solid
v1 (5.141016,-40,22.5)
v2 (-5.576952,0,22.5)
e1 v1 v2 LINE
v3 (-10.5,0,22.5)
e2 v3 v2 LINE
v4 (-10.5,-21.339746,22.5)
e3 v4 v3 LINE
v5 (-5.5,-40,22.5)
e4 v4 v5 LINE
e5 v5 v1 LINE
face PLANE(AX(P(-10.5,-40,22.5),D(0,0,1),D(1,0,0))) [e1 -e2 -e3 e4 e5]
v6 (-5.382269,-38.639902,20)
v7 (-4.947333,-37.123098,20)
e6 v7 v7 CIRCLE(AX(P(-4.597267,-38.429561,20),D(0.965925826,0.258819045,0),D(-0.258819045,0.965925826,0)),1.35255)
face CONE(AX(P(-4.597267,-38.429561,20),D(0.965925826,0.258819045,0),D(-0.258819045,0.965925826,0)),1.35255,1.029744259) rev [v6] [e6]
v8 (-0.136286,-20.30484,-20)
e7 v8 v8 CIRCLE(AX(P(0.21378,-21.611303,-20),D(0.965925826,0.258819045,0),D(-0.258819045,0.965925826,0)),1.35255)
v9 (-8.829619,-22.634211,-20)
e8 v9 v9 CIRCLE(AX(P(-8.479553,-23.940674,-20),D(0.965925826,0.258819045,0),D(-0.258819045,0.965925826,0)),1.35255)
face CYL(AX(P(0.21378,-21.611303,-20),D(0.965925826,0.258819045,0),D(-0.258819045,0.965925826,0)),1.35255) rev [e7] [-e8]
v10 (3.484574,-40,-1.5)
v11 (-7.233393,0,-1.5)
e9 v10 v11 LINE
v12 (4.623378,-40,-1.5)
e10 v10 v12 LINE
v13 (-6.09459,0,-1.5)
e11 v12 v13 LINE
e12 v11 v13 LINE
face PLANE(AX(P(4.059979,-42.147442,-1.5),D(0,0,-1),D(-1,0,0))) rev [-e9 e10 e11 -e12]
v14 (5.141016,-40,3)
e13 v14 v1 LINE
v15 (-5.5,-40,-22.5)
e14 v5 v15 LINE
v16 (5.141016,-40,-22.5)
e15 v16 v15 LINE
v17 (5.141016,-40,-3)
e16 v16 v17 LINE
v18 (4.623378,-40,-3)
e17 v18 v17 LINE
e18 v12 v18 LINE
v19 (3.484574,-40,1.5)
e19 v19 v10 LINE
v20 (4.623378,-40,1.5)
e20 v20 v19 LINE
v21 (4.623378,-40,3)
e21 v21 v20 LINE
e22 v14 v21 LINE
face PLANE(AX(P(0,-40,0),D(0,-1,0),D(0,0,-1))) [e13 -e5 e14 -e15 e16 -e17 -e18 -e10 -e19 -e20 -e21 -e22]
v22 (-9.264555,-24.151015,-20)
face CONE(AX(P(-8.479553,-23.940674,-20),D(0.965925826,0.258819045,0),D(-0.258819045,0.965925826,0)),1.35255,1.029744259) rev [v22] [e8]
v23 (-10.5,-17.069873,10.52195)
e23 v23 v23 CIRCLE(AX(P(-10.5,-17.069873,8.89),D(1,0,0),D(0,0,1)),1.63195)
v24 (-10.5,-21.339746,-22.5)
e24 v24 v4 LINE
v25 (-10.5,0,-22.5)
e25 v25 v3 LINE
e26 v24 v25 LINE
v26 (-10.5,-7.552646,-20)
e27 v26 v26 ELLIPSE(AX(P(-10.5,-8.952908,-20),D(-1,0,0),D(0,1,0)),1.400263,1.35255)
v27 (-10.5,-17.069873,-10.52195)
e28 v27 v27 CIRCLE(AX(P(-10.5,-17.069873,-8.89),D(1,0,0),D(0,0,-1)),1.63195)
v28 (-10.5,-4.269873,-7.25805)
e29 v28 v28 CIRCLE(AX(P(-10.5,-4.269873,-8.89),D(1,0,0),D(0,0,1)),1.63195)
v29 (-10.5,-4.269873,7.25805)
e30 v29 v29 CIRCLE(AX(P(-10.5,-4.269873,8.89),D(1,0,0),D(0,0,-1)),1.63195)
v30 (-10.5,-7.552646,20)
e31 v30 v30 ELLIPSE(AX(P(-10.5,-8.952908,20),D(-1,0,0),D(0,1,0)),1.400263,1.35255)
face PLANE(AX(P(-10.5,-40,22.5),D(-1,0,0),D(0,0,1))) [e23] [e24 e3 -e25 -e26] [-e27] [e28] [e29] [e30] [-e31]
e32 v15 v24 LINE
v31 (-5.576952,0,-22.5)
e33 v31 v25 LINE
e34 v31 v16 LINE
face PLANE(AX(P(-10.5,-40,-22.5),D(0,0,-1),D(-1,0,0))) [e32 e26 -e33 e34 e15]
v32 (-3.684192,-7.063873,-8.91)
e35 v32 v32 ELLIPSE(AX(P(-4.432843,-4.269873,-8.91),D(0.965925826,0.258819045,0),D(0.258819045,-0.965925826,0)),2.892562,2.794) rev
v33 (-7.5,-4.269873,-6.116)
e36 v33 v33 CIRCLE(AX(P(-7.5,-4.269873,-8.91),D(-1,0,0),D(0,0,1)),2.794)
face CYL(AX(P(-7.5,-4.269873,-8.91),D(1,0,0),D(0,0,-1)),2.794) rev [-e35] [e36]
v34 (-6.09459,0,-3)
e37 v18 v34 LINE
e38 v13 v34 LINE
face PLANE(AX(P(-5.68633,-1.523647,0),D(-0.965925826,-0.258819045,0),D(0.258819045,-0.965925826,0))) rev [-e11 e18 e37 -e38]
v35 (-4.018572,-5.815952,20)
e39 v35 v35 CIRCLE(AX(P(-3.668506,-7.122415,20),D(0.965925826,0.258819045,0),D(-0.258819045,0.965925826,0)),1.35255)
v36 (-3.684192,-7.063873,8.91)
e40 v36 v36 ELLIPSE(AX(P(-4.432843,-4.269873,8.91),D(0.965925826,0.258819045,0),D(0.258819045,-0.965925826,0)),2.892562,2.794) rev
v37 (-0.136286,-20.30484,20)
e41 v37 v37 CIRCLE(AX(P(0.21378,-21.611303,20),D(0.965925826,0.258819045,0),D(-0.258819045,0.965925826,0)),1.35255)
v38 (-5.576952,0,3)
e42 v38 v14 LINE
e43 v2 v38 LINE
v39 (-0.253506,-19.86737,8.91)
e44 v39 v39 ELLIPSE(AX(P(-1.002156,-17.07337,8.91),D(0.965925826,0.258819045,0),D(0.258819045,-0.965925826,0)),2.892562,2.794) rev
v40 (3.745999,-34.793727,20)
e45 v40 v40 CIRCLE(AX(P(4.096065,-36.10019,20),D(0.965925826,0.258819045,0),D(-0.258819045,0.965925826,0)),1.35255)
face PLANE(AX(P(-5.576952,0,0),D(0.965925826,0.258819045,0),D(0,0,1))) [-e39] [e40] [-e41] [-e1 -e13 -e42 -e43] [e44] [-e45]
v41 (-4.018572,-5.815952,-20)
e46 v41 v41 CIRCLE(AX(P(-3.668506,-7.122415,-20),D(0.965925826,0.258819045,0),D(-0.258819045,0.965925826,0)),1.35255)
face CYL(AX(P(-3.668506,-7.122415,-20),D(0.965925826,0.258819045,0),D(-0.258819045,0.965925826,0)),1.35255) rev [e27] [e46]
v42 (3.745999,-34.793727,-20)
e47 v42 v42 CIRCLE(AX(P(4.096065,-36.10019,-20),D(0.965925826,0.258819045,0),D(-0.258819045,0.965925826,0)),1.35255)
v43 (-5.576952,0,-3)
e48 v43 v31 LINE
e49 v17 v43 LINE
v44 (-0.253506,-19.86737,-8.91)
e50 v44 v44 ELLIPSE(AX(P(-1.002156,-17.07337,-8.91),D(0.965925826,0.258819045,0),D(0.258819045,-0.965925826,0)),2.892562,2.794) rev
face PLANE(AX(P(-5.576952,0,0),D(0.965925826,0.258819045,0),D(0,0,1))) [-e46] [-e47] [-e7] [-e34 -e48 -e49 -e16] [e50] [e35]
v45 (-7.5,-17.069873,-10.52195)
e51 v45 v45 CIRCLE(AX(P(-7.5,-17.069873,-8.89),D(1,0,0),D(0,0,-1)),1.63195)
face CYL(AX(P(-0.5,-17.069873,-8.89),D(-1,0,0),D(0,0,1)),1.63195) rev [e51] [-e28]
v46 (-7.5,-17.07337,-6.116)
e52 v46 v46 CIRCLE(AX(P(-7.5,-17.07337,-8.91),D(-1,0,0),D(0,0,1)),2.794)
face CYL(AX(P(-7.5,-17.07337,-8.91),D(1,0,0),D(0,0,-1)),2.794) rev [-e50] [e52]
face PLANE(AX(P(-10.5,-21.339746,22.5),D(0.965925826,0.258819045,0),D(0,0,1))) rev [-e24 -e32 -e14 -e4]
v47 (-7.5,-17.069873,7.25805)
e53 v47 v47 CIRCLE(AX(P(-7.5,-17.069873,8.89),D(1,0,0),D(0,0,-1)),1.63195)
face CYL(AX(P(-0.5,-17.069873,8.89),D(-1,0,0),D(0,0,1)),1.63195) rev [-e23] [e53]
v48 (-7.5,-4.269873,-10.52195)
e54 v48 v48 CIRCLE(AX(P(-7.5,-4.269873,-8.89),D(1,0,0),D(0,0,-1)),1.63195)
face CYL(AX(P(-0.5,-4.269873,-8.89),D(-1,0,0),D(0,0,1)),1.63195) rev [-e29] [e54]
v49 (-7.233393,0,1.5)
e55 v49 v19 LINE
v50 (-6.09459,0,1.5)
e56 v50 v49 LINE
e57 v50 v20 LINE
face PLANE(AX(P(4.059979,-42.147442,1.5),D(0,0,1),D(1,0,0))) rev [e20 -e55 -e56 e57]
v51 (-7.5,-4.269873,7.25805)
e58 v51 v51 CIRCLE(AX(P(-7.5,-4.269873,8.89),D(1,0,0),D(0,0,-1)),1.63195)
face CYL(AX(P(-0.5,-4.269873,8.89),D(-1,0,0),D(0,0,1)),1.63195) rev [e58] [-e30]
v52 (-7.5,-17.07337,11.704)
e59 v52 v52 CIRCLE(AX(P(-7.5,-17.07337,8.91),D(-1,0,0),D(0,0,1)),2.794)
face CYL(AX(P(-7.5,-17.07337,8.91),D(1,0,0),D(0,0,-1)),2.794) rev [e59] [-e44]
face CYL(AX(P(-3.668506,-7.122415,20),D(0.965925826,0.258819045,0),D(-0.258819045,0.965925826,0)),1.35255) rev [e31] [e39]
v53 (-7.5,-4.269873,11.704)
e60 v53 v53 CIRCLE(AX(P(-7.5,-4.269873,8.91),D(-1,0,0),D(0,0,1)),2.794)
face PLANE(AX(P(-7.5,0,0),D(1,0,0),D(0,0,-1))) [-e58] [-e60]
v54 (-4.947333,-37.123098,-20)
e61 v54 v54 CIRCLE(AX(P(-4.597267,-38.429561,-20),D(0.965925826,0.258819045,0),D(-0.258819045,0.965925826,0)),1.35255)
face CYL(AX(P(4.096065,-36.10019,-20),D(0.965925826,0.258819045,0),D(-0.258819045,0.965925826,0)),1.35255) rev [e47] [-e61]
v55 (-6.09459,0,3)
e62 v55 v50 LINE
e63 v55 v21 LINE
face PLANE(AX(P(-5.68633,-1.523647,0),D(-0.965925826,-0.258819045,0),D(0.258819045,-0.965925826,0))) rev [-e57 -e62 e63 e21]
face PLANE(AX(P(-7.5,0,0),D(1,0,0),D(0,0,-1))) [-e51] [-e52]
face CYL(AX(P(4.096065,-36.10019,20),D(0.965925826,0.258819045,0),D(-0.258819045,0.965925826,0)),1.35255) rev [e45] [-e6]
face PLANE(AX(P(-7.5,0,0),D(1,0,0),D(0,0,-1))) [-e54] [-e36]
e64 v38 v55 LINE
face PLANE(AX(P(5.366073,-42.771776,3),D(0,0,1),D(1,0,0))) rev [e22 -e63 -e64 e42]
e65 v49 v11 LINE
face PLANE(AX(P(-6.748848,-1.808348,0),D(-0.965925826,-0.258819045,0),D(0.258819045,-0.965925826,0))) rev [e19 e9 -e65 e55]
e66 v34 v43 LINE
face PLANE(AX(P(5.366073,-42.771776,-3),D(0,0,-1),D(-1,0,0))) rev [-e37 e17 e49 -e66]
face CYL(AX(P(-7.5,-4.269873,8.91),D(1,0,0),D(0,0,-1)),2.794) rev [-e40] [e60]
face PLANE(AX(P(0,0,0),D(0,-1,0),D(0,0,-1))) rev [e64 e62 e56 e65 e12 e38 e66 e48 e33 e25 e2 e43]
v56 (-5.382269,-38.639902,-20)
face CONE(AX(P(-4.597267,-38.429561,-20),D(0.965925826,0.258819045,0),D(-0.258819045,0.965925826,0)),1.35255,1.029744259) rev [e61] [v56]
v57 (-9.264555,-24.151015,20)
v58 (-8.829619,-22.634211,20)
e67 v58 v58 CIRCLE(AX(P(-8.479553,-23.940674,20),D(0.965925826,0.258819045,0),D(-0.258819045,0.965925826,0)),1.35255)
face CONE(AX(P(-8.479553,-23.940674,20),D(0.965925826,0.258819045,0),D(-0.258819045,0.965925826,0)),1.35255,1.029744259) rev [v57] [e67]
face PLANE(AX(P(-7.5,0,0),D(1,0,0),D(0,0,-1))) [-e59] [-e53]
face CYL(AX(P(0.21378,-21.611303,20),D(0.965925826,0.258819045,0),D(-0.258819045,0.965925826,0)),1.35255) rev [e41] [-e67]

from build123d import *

# Parameters (mm, degrees)
SKETCH1_W                 = 21
SKETCH1_H                 = 45
BOSS_EXTRUDE1_DEPTH       = 40
CHAMFER1_SIZE             = 60
CHAMFER1_SIZE_2           = 16.076951546
SKETCH2_W                 = 3
SKETCH2_H                 = 45
CUT_EXTRUDE1_DEPTH        = 1.6
F_6_32_TAPPED_HOLE1_D     = 2.7051
F_6_32_TAPPED_HOLE1_DEPTH = 9
F_6_32_TAPPED_HOLE1_TIP   = 0.81269403
CHAMFER2_SIZE             = 5
CHAMFER2_SIZE2            = 18.660254038
SKETCH11_R                = 1.63195
CUT_EXTRUDE3_DEPTH        = 10
F_3DSKETCH1_R             = 2.794
CUT_EXTRUDE4_DEPTH        = 8
SKETCH12_W                = 6
SKETCH12_H                = 45
CUT_EXTRUDE5_DEPTH        = 0.5


with BuildPart() as part:
    # Sketch1 → Boss-Extrude1 (new body)
    with BuildSketch(Plane(origin=(0, 0, 0), x_dir=(1, 0, 0), z_dir=(0, 1, 0))):
        Rectangle(SKETCH1_W, SKETCH1_H)
    extrude(amount=-BOSS_EXTRUDE1_DEPTH)

    # Chamfer1
    # the kernel refuses this chamfer: 60, 16.076951546 mm, written as the material it takes off along each edge
    with BuildSketch(Plane(origin=(10.5, 0, 178.303294212), x_dir=(0.009967146577156426, -0.9999503267608394, 0), z_dir=(0, 0, -1))) as chamfer1_piece_1:
        Polygon((CHAMFER1_SIZE * 0.999950326761, CHAMFER1_SIZE * 0.00996714657716), (-CHAMFER1_SIZE_2 * 0.00996714657707, CHAMFER1_SIZE_2 * 0.999950326753), (0, 0), align=None)
    extrude(amount=356.606588424, mode=Mode.SUBTRACT)

    # Sketch2 → Cut-Extrude1 (cut)
    with BuildSketch(Plane(origin=(-5.20336663, -1.394237886, 0), x_dir=(0, 0, -1), z_dir=(0.965925826289069, 0.2588190451025185, 0))):
        with Locations((0, -19.262102335)):
            Rectangle(SKETCH2_W, SKETCH2_H)
    extrude(amount=-CUT_EXTRUDE1_DEPTH, mode=Mode.SUBTRACT)

    # #6-32 Tapped Hole1
    with Locations(Plane(origin=(-5.20336663, -1.394237886, 0), x_dir=(0, 0, -1), z_dir=(0.965925826289069, 0.2588190451025185, 0))):
        with Locations((-20, -20.93024544), (20, -20.93024544), (-20, -5.93024544), (-20, -35.93024544), (20, -35.93024544), (20, -5.93024544)):
            Hole(F_6_32_TAPPED_HOLE1_D / 2, depth=F_6_32_TAPPED_HOLE1_DEPTH)
            with Locations((0, 0, -(F_6_32_TAPPED_HOLE1_DEPTH + F_6_32_TAPPED_HOLE1_TIP / 2))):  # 118° drill point
                Cone(0, F_6_32_TAPPED_HOLE1_D / 2, F_6_32_TAPPED_HOLE1_TIP, mode=Mode.SUBTRACT)

    # Chamfer2
    chamfer2_edges = [part.edges().sort_by_distance(p)[0] for p in [
        (-10.5, -40, 0),
    ]]
    chamfer2_side = [part.faces().sort_by_distance(p)[0] for p in [
        (-2.729210232, -40, 0),
    ]]
    chamfer(chamfer2_edges, length=CHAMFER2_SIZE, length2=CHAMFER2_SIZE2, reference=chamfer2_side[0])

    # Sketch11 → Cut-Extrude3 (cut)
    with BuildSketch(Plane(origin=(-10.5, 29.282032303, 0), x_dir=(0, 0, 1), z_dir=(1, 0, 0))):
        with Locations(Location((8.89, 33.551905284, 0), (0, 0, 270))):
            Circle(SKETCH11_R)
        with Locations((8.89, 46.351905284)):
            Circle(SKETCH11_R)
        with Locations(Location((-8.89, 46.351905284, 0), (0, 0, 270))):
            Circle(SKETCH11_R)
        with Locations((-8.89, 33.551905284)):
            Circle(SKETCH11_R)
    extrude(amount=CUT_EXTRUDE3_DEPTH, mode=Mode.SUBTRACT)

    # 3DSketch1 → Cut-Extrude4 (cut)
    with BuildSketch(Plane(origin=(-7.5, -4.269872981, -8.91), x_dir=(0, -0.5834969796278836, 0.812115308786343), z_dir=(-1, 0, 0))):
        with Locations(Location((0, 0, 0), (0, 0, 305.696879334))):
            Circle(F_3DSKETCH1_R)
        with Locations(Location((14.471894803, 10.397916177, 0), (0, 0, 305.696879334))):
            Circle(F_3DSKETCH1_R)
        with Locations(Location((21.942696816, 0, 0), (0, 0, 305.696879334))):
            Circle(F_3DSKETCH1_R)
        with Locations(Location((7.470802013, -10.397916177, 0), (0, 0, 305.696879334))):
            Circle(F_3DSKETCH1_R)
    extrude(amount=-CUT_EXTRUDE4_DEPTH, mode=Mode.SUBTRACT)

    # Sketch12 → Cut-Extrude5 (cut)
    with BuildSketch(Plane(origin=(-5.20336663, -1.394237886, 0), x_dir=(0, 0, -1), z_dir=(0.9659258262890663, 0.25881904510252807, 0))):
        with Locations((0, -20.203205195)):
            Rectangle(SKETCH12_W, SKETCH12_H)
    extrude(amount=-CUT_EXTRUDE5_DEPTH, mode=Mode.SUBTRACT)


solid = part.part
